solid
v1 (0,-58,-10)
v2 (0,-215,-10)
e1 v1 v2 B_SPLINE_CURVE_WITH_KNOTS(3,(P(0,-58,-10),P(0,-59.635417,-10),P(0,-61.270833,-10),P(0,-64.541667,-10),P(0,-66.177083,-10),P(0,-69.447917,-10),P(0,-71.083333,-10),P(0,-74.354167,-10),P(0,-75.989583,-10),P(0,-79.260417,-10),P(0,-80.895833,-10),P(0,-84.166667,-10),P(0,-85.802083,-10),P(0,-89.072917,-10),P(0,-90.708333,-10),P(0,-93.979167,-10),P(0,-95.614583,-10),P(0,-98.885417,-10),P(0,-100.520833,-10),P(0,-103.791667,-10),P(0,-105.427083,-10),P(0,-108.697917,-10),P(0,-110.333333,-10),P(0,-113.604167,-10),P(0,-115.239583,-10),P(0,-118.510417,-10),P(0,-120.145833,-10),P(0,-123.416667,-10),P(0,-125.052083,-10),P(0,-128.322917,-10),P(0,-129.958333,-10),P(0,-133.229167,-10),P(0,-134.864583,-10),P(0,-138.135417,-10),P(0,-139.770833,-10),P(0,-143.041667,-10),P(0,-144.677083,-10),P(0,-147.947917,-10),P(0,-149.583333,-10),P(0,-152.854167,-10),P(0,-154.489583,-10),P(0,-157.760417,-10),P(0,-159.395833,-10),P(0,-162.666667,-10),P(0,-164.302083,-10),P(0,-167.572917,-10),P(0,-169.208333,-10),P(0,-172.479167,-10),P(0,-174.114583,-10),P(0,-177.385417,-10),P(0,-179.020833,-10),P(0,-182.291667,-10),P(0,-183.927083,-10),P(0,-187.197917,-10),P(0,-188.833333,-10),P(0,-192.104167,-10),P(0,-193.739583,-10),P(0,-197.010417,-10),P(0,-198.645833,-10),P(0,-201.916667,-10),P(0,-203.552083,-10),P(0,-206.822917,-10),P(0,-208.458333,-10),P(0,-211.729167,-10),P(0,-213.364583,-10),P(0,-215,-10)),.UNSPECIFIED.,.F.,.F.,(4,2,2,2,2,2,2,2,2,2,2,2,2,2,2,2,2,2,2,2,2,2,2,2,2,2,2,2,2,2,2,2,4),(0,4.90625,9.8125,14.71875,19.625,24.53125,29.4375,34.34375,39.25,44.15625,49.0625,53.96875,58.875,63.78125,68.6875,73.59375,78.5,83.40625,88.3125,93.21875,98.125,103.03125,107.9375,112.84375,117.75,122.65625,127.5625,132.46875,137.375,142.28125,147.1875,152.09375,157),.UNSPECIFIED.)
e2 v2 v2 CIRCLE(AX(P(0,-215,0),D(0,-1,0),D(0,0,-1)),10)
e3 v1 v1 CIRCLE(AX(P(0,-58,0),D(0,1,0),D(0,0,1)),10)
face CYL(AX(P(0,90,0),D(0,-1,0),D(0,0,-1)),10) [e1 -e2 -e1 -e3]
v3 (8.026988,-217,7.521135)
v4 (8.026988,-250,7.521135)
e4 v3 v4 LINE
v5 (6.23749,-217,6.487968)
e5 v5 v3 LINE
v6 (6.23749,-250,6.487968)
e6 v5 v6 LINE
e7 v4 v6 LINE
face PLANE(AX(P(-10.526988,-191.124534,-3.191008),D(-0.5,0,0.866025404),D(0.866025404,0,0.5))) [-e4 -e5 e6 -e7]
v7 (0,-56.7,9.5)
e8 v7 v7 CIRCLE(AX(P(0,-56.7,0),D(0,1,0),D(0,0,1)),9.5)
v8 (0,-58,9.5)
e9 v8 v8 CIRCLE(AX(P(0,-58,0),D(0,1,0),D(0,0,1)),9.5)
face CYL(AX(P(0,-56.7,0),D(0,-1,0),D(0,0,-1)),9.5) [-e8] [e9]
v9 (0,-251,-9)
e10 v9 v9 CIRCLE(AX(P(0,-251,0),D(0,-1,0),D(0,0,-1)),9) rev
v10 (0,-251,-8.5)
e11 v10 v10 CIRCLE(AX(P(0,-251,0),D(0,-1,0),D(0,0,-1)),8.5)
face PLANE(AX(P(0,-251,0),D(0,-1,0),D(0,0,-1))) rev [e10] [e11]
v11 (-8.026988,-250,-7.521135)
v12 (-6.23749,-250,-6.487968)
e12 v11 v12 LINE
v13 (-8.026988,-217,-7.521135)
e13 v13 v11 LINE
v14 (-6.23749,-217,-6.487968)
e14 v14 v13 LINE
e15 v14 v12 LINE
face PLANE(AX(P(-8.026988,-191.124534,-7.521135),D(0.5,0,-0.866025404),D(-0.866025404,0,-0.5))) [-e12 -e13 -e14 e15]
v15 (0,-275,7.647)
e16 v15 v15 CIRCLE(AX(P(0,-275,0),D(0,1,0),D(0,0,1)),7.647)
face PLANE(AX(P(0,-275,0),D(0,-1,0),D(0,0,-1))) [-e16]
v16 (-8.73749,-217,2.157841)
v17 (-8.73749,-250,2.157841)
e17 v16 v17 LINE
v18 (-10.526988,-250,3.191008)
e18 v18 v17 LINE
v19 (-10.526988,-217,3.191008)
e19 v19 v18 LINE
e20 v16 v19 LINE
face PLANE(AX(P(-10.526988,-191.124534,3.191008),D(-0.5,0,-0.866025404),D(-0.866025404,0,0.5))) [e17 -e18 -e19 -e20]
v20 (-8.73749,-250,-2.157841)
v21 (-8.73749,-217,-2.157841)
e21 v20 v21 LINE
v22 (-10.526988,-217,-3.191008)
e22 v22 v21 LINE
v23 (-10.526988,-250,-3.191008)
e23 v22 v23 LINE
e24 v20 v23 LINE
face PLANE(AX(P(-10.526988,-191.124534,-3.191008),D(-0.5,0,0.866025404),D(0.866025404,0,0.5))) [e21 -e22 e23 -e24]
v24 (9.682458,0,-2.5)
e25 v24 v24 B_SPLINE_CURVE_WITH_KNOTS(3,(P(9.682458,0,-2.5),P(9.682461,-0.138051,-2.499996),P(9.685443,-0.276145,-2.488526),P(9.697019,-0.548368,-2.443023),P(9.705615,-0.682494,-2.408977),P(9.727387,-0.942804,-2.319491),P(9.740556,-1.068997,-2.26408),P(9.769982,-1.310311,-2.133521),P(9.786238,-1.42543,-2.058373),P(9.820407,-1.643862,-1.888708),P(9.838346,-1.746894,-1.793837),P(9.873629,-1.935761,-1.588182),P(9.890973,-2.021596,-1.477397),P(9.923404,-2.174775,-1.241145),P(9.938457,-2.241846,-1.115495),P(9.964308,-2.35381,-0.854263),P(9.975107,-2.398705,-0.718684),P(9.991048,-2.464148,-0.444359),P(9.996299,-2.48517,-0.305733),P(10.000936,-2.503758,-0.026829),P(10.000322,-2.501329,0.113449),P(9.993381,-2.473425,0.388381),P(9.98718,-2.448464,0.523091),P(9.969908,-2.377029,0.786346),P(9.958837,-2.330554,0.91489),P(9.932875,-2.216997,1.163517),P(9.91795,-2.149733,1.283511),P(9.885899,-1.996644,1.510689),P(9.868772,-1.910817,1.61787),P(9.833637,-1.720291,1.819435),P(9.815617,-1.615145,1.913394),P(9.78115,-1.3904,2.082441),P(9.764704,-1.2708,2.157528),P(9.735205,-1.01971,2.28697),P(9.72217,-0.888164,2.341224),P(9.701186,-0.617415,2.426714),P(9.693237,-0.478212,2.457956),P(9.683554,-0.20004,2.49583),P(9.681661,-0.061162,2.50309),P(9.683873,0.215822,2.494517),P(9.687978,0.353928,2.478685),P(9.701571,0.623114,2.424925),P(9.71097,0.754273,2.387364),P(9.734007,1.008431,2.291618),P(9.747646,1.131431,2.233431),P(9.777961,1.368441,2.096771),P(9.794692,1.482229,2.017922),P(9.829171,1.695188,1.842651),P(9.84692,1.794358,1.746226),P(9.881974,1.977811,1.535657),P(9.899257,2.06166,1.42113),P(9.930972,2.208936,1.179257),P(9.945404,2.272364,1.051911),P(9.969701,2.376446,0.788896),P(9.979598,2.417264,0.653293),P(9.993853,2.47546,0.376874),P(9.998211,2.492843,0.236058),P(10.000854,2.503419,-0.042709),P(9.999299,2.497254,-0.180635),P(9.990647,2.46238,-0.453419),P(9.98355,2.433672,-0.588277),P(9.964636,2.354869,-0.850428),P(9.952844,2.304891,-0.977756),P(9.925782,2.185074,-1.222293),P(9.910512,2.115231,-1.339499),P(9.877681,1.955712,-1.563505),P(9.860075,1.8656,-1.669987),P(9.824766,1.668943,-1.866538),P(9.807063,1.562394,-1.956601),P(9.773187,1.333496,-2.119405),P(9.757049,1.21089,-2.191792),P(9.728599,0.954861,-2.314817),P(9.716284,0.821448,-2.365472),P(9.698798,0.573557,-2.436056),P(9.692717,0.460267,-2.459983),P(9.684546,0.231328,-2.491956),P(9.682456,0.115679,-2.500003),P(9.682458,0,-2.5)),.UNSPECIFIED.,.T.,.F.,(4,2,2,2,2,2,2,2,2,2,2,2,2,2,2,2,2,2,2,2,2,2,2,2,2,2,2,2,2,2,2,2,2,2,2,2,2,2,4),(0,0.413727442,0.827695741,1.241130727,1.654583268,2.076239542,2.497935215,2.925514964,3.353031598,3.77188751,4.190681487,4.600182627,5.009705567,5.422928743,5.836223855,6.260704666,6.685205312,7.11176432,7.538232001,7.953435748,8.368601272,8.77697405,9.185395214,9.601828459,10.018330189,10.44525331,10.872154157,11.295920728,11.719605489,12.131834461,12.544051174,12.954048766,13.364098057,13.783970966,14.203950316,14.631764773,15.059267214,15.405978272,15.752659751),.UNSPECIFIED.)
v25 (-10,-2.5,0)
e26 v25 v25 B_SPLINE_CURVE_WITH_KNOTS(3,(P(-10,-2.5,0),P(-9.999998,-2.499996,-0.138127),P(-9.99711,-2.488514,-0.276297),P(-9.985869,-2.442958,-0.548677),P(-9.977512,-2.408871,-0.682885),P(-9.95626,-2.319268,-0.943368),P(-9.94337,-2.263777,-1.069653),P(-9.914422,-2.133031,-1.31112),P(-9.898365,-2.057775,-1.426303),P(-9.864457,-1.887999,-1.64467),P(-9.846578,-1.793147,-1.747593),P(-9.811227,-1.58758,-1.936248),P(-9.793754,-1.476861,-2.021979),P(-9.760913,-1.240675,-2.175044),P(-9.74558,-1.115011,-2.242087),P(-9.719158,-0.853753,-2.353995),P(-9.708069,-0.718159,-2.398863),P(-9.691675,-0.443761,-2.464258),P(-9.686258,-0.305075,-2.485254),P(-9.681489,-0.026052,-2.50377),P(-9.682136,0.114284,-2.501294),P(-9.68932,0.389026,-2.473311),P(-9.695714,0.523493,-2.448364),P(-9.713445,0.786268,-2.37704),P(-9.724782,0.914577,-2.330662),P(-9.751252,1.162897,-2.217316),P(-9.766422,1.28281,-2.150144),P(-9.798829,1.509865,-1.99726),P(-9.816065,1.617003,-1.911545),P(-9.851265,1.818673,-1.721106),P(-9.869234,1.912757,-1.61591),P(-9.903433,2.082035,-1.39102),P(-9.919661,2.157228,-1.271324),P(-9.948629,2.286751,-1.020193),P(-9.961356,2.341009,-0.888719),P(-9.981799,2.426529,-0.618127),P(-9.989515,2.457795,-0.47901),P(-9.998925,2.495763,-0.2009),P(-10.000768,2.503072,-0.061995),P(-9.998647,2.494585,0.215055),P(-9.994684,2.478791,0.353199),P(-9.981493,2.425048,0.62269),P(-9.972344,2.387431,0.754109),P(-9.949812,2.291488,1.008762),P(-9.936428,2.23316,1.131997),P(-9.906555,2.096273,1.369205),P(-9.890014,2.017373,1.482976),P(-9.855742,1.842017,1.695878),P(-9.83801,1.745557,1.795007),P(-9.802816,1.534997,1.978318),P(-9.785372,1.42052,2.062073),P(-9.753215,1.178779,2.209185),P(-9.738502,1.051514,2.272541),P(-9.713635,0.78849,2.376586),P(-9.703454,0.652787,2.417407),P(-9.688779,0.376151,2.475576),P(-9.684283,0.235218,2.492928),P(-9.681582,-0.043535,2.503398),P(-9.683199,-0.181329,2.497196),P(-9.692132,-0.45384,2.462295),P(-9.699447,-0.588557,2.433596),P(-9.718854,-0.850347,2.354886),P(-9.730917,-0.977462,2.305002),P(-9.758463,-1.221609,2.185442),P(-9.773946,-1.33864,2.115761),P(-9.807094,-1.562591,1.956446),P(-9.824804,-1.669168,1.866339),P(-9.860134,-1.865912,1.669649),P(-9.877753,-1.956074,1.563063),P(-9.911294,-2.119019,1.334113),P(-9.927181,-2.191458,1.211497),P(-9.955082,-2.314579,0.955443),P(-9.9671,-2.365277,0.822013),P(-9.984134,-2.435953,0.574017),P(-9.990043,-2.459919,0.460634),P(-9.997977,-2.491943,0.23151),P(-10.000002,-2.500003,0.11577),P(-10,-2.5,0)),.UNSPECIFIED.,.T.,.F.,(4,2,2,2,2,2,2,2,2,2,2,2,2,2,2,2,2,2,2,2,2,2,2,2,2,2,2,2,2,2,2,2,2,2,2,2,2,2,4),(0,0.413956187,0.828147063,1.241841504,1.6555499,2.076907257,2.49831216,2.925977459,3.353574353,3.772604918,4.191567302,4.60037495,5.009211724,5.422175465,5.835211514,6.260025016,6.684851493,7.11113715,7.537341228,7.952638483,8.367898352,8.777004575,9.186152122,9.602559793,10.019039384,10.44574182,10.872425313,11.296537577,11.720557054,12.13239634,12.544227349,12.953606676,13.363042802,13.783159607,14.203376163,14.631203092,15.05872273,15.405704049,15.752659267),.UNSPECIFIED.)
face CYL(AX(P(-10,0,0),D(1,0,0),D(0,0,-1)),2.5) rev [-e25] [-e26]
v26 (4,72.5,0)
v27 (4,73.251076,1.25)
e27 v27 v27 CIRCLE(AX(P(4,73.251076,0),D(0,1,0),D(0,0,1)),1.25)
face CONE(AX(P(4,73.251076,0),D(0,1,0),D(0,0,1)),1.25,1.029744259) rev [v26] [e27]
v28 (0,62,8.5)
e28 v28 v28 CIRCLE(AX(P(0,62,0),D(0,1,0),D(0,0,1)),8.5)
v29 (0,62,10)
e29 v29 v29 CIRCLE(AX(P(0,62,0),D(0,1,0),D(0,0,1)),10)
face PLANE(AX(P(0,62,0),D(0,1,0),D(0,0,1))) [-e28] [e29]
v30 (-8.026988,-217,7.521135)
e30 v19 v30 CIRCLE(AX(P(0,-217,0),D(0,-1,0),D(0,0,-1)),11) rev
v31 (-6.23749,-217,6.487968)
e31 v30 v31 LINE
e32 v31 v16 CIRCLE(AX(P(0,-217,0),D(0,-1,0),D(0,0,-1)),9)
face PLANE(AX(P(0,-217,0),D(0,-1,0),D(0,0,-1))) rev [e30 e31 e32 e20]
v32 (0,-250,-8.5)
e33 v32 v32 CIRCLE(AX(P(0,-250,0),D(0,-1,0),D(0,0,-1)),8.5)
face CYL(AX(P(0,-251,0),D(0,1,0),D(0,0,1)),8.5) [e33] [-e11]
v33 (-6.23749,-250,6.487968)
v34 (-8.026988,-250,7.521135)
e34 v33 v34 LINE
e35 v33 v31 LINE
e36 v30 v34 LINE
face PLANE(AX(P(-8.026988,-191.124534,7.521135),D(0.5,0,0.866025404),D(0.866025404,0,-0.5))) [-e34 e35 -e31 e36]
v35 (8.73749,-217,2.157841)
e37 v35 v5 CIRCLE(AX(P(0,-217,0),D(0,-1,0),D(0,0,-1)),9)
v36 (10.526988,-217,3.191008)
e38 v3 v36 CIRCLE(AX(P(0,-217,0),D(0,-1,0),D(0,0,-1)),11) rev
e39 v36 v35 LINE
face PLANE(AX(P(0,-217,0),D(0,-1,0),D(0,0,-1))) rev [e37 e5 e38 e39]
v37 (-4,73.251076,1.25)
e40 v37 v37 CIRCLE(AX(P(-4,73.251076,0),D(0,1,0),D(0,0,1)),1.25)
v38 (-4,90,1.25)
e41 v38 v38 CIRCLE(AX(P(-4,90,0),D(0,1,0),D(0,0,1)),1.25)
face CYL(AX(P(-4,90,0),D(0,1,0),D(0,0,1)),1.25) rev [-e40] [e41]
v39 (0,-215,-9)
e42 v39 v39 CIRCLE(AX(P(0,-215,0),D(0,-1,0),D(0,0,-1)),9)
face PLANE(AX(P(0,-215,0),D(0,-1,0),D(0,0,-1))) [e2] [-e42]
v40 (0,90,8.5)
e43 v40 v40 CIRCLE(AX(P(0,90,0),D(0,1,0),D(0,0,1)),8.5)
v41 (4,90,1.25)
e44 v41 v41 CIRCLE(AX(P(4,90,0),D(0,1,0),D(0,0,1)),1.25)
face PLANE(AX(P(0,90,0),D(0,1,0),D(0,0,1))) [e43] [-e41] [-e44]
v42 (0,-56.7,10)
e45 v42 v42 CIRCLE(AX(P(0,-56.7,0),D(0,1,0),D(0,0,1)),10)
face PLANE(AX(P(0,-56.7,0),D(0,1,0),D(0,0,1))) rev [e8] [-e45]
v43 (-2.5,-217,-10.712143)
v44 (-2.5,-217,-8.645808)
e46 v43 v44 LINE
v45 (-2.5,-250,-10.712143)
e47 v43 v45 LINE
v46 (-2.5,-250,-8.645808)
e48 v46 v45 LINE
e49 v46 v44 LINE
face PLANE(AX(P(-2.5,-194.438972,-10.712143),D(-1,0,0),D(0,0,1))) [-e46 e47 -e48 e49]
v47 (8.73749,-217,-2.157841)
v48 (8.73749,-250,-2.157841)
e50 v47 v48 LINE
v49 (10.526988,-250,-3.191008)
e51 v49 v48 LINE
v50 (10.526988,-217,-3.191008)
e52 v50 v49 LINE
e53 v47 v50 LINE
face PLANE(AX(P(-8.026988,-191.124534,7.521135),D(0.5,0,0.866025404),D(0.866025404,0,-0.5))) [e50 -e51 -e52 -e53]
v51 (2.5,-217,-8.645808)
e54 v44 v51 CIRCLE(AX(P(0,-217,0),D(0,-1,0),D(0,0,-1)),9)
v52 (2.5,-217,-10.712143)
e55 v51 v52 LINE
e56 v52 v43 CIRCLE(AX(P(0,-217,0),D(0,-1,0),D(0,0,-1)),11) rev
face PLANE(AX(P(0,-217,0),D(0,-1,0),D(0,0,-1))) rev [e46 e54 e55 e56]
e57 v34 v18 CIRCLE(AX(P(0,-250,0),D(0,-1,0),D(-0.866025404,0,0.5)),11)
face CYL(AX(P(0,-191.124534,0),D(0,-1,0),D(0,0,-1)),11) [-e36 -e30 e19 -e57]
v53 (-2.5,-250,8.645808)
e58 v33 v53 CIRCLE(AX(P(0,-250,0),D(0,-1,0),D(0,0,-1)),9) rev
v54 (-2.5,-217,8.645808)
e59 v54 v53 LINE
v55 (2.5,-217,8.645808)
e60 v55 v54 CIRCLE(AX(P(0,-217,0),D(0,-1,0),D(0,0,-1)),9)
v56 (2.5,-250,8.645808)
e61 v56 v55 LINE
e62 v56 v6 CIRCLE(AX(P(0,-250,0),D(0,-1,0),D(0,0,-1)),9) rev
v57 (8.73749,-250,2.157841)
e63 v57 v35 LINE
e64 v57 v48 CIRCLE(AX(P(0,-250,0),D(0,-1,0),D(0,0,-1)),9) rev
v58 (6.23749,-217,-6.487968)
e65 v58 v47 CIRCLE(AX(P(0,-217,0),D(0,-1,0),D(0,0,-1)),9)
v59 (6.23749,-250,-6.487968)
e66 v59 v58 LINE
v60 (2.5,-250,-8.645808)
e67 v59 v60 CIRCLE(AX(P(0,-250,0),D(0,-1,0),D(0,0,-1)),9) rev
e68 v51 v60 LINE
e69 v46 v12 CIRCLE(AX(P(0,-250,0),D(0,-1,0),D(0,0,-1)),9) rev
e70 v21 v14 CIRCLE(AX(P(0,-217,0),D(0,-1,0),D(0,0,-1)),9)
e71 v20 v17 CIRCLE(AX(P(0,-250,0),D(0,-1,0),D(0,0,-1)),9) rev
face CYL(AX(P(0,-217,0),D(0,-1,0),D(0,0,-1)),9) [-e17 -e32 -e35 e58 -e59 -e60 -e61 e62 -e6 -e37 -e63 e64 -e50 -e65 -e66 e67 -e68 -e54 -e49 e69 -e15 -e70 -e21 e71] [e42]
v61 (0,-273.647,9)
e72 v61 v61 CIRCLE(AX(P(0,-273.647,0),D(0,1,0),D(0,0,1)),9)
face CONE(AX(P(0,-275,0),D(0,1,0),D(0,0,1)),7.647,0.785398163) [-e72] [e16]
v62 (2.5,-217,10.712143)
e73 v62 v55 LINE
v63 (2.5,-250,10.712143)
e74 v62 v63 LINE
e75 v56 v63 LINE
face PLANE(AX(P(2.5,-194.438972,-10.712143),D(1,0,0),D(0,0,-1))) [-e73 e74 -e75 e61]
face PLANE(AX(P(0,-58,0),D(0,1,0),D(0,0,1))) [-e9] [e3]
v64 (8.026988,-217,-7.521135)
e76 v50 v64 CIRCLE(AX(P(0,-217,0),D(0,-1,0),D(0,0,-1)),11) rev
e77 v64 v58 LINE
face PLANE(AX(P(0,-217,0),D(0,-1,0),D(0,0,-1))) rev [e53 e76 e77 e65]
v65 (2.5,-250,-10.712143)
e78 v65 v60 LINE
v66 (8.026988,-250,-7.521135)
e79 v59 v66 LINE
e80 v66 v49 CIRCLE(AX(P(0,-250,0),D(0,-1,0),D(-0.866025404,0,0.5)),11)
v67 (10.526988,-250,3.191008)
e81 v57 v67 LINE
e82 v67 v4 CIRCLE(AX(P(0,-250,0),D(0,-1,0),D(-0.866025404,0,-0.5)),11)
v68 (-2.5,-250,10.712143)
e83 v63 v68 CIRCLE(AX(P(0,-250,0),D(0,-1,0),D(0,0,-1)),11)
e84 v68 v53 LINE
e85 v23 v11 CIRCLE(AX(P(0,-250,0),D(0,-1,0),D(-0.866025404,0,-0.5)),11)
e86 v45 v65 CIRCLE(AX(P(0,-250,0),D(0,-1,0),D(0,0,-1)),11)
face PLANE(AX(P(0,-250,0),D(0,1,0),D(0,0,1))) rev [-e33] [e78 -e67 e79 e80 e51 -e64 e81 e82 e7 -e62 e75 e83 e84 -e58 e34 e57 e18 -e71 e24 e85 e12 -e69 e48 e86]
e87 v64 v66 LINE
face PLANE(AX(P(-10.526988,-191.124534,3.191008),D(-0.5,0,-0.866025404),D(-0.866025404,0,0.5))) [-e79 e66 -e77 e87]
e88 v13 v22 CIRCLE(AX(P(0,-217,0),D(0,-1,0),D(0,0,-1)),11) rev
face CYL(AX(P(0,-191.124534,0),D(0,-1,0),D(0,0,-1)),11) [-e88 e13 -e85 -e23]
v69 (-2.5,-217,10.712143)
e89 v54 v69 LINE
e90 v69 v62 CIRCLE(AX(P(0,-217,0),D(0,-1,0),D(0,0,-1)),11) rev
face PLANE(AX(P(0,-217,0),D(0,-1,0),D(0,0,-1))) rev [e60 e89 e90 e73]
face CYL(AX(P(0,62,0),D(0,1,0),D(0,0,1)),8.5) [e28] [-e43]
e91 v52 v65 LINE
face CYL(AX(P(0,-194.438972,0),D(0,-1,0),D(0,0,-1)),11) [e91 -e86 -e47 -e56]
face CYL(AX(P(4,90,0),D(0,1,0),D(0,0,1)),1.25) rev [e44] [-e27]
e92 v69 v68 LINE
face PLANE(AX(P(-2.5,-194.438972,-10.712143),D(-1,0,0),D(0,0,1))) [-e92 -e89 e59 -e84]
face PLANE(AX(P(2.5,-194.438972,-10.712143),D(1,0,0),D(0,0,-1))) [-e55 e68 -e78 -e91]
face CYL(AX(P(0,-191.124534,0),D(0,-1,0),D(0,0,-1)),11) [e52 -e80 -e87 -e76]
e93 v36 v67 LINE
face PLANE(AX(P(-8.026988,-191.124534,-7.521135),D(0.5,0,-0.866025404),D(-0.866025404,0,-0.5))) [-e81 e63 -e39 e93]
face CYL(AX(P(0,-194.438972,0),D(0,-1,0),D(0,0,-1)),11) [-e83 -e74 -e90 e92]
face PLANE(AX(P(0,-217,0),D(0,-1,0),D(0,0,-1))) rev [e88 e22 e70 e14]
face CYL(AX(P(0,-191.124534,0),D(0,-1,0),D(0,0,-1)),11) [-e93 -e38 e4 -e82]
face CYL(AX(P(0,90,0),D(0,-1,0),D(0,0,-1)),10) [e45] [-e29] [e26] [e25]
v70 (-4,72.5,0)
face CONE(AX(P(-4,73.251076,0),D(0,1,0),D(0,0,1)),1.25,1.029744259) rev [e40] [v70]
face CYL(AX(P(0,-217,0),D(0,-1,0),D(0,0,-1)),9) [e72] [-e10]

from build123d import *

# Parameters (mm, degrees)
EXTRUDE_1_DEPTH          = 90
EXTRUDE_1_DEPTH_BACK     = 250
SKETCH_1_R               = 10
CUT_EXTRUDE_1_DEPTH      = 251.399680511
CUT_EXTRUDE_1_DEPTH_BACK = 251.399680511
SKETCH_2_R               = 2.5
CHAMFER_1_SIZE           = 1
CUT_EXTRUDE_START        = -58
SKETCH_3_OUTSIDE_W       = 90.234
SKETCH_3_OUTSIDE_H       = 90.234
SKETCH_3_OUTSIDE_R       = 9.5
CUT_EXTRUDE_2_DEPTH      = 1.3
SKETCH_4_OUTSIDE_W       = 90.234
SKETCH_4_OUTSIDE_H       = 90.234
SKETCH_4_OUTSIDE_R       = 8.5
CUT_EXTRUDE_3_DEPTH      = 28
HOLE_WIZARD_M3_1_D       = 2.5
HOLE_WIZARD_M3_1_DEPTH   = 16.748924226
HOLE_WIZARD_M3_1_TIP     = 0.751075774
SKETCH_12_OUTSIDE_W      = 90.234
SKETCH_12_OUTSIDE_H      = 90.234
SKETCH_12_OUTSIDE_R      = 9
CUT_EXTRUDE_4_DEPTH      = 33
EXTRUDE_2_DEPTH          = 33
PATTERN_CIRCULAR_1_COUNT = 6
SKETCH_14_OUTSIDE_W      = 91.326
SKETCH_14_OUTSIDE_H      = 92.272
SKETCH_14_OUTSIDE_R      = 9
CUT_EXTRUDE_5_DEPTH      = 2
EXTRUDE_START            = 25
SKETCH_15_R              = 9
EXTRUDE_3_DEPTH          = 25
CUT_EXTRUDE_START_2      = -25
SKETCH_16_OUTSIDE_W      = 96.308
SKETCH_16_OUTSIDE_H      = 97.254
SKETCH_16_OUTSIDE_R      = 8.5
CUT_EXTRUDE_6_DEPTH      = 1


# Read off the part's stored shape, not the designer's step: M18 机械螺纹 螺柱1
with BuildPart() as part:
    # 草图1 → 凸台-拉伸1 (new, two sides: drawn at the far end of the back side and taken through both)
    with BuildSketch(Plane(origin=(0, 0, 0), x_dir=(1, 0, 0), z_dir=(0, 1, 0)).offset(-EXTRUDE_1_DEPTH_BACK)):
        with Locations(Location((0, 0, 0), (0, 0, 90))):
            Circle(SKETCH_1_R)
    extrude(amount=EXTRUDE_1_DEPTH + EXTRUDE_1_DEPTH_BACK)

    # 草图2 → 切除-拉伸1 (cut, two sides: drawn at the far end of the back side and taken through both)
    with BuildSketch(Plane(origin=(0, 0, 0), x_dir=(0, 0, -1), z_dir=(1, 0, 0)).offset(-CUT_EXTRUDE_1_DEPTH_BACK)):
        Circle(SKETCH_2_R)
    extrude(amount=CUT_EXTRUDE_1_DEPTH + CUT_EXTRUDE_1_DEPTH_BACK, mode=Mode.SUBTRACT)

    # 倒角1
    chamfer_1_edges = [part.edges().sort_by_distance(p)[0] for p in [
        (0, 90, 10),
    ]]
    chamfer(chamfer_1_edges, length=CHAMFER_1_SIZE)

    # 草图3 outside → 切除-拉伸2 (cut)
    with BuildSketch(Plane(origin=(0, 0, 0), x_dir=(1, 0, 0), z_dir=(0, 1, 0)).offset(CUT_EXTRUDE_START)):
        Rectangle(SKETCH_3_OUTSIDE_W, SKETCH_3_OUTSIDE_H)
        with Locations(Location((0, 0, 0), (0, 0, 270))):
            Circle(SKETCH_3_OUTSIDE_R, mode=Mode.SUBTRACT)
    extrude(amount=CUT_EXTRUDE_2_DEPTH, mode=Mode.SUBTRACT)

    # 草图4 outside → 切除-拉伸3 (cut)
    with BuildSketch(Plane(origin=(0, 90, 0), x_dir=(1, 0, 0), z_dir=(0, 1, 0))):
        Rectangle(SKETCH_4_OUTSIDE_W, SKETCH_4_OUTSIDE_H)
        with Locations(Location((0, 0, 0), (0, 0, 270))):
            Circle(SKETCH_4_OUTSIDE_R, mode=Mode.SUBTRACT)
    extrude(amount=-CUT_EXTRUDE_3_DEPTH, mode=Mode.SUBTRACT)

    # M3 螺纹孔1
    with Locations(Plane(origin=(0, 90, 0), x_dir=(1, 0, 0), z_dir=(0, 1, 0))):
        with Locations((4, 0), (-4, 0)):
            Hole(HOLE_WIZARD_M3_1_D / 2, depth=HOLE_WIZARD_M3_1_DEPTH)
            with Locations((0, 0, -(HOLE_WIZARD_M3_1_DEPTH + HOLE_WIZARD_M3_1_TIP / 2))):  # 118° drill point
                Cone(0, HOLE_WIZARD_M3_1_D / 2, HOLE_WIZARD_M3_1_TIP, mode=Mode.SUBTRACT)

    # 草图12 outside → 切除-拉伸4 (cut)
    with BuildSketch(Plane.XZ.offset(250)):
        Rectangle(SKETCH_12_OUTSIDE_W, SKETCH_12_OUTSIDE_H)
        with Locations(Location((0, 0, 0), (0, 0, 270))):
            Circle(SKETCH_12_OUTSIDE_R, mode=Mode.SUBTRACT)
    extrude(amount=-CUT_EXTRUDE_4_DEPTH, mode=Mode.SUBTRACT)

    # 草图13 → 凸台-拉伸2 (add)
    with BuildSketch(Plane.XZ.offset(250)):
        with BuildLine():
            Line((-2.5, -10.712142643), (-2.5, 10.712142643))
            ThreePointArc((-2.5, 10.712142643), (0, 11), (2.5, 10.712142643))
            Line((2.5, 10.712142643), (2.5, -10.712142643))
            ThreePointArc((2.5, -10.712142643), (0, -11), (-2.5, -10.712142643))
        make_face()
    extrude_2 = extrude(amount=-EXTRUDE_2_DEPTH)

    # 阵列(圆周)1: 凸台-拉伸2 ×6 about axis
    pattern_circular_1_axis = Axis((0, 0, 0), (0, 1, 0))
    for i in range(1, PATTERN_CIRCULAR_1_COUNT):
        add(extrude_2.rotate(pattern_circular_1_axis, i * 360 / PATTERN_CIRCULAR_1_COUNT))

    # 草图14 outside → 切除-拉伸5 (cut)
    with BuildSketch(Plane.XZ.offset(217)):
        Rectangle(SKETCH_14_OUTSIDE_W, SKETCH_14_OUTSIDE_H)
        with Locations(Location((0, 0, 0), (0, 0, 270))):
            Circle(SKETCH_14_OUTSIDE_R, mode=Mode.SUBTRACT)
    extrude(amount=-CUT_EXTRUDE_5_DEPTH, mode=Mode.SUBTRACT)

    # 草图15 → 凸台-拉伸3 (add)
    with BuildSketch(Plane.XZ.offset(250).offset(EXTRUDE_START)):
        with Locations(Location((0, 0, 0), (0, 0, 270))):
            Circle(SKETCH_15_R)
    extrude(amount=-EXTRUDE_3_DEPTH)

    # 草图16 outside → 切除-拉伸6 (cut)
    with BuildSketch(Plane.XZ.offset(275).offset(CUT_EXTRUDE_START_2)):
        Rectangle(SKETCH_16_OUTSIDE_W, SKETCH_16_OUTSIDE_H)
        with Locations(Location((0, 0, 0), (0, 0, 90))):
            Circle(SKETCH_16_OUTSIDE_R, mode=Mode.SUBTRACT)
    extrude(amount=CUT_EXTRUDE_6_DEPTH, mode=Mode.SUBTRACT)

    # M18 机械螺纹 螺柱1 outline → M18 机械螺纹 螺柱1 (revolve, cut)
    with BuildSketch(Plane.XY):
        Polygon((9, -273.647), (7.647, -275), (9, -275), align=None)
    revolve(axis=Axis((0, 0, 0), (0, 1, 0)), mode=Mode.SUBTRACT)


solid = part.part
